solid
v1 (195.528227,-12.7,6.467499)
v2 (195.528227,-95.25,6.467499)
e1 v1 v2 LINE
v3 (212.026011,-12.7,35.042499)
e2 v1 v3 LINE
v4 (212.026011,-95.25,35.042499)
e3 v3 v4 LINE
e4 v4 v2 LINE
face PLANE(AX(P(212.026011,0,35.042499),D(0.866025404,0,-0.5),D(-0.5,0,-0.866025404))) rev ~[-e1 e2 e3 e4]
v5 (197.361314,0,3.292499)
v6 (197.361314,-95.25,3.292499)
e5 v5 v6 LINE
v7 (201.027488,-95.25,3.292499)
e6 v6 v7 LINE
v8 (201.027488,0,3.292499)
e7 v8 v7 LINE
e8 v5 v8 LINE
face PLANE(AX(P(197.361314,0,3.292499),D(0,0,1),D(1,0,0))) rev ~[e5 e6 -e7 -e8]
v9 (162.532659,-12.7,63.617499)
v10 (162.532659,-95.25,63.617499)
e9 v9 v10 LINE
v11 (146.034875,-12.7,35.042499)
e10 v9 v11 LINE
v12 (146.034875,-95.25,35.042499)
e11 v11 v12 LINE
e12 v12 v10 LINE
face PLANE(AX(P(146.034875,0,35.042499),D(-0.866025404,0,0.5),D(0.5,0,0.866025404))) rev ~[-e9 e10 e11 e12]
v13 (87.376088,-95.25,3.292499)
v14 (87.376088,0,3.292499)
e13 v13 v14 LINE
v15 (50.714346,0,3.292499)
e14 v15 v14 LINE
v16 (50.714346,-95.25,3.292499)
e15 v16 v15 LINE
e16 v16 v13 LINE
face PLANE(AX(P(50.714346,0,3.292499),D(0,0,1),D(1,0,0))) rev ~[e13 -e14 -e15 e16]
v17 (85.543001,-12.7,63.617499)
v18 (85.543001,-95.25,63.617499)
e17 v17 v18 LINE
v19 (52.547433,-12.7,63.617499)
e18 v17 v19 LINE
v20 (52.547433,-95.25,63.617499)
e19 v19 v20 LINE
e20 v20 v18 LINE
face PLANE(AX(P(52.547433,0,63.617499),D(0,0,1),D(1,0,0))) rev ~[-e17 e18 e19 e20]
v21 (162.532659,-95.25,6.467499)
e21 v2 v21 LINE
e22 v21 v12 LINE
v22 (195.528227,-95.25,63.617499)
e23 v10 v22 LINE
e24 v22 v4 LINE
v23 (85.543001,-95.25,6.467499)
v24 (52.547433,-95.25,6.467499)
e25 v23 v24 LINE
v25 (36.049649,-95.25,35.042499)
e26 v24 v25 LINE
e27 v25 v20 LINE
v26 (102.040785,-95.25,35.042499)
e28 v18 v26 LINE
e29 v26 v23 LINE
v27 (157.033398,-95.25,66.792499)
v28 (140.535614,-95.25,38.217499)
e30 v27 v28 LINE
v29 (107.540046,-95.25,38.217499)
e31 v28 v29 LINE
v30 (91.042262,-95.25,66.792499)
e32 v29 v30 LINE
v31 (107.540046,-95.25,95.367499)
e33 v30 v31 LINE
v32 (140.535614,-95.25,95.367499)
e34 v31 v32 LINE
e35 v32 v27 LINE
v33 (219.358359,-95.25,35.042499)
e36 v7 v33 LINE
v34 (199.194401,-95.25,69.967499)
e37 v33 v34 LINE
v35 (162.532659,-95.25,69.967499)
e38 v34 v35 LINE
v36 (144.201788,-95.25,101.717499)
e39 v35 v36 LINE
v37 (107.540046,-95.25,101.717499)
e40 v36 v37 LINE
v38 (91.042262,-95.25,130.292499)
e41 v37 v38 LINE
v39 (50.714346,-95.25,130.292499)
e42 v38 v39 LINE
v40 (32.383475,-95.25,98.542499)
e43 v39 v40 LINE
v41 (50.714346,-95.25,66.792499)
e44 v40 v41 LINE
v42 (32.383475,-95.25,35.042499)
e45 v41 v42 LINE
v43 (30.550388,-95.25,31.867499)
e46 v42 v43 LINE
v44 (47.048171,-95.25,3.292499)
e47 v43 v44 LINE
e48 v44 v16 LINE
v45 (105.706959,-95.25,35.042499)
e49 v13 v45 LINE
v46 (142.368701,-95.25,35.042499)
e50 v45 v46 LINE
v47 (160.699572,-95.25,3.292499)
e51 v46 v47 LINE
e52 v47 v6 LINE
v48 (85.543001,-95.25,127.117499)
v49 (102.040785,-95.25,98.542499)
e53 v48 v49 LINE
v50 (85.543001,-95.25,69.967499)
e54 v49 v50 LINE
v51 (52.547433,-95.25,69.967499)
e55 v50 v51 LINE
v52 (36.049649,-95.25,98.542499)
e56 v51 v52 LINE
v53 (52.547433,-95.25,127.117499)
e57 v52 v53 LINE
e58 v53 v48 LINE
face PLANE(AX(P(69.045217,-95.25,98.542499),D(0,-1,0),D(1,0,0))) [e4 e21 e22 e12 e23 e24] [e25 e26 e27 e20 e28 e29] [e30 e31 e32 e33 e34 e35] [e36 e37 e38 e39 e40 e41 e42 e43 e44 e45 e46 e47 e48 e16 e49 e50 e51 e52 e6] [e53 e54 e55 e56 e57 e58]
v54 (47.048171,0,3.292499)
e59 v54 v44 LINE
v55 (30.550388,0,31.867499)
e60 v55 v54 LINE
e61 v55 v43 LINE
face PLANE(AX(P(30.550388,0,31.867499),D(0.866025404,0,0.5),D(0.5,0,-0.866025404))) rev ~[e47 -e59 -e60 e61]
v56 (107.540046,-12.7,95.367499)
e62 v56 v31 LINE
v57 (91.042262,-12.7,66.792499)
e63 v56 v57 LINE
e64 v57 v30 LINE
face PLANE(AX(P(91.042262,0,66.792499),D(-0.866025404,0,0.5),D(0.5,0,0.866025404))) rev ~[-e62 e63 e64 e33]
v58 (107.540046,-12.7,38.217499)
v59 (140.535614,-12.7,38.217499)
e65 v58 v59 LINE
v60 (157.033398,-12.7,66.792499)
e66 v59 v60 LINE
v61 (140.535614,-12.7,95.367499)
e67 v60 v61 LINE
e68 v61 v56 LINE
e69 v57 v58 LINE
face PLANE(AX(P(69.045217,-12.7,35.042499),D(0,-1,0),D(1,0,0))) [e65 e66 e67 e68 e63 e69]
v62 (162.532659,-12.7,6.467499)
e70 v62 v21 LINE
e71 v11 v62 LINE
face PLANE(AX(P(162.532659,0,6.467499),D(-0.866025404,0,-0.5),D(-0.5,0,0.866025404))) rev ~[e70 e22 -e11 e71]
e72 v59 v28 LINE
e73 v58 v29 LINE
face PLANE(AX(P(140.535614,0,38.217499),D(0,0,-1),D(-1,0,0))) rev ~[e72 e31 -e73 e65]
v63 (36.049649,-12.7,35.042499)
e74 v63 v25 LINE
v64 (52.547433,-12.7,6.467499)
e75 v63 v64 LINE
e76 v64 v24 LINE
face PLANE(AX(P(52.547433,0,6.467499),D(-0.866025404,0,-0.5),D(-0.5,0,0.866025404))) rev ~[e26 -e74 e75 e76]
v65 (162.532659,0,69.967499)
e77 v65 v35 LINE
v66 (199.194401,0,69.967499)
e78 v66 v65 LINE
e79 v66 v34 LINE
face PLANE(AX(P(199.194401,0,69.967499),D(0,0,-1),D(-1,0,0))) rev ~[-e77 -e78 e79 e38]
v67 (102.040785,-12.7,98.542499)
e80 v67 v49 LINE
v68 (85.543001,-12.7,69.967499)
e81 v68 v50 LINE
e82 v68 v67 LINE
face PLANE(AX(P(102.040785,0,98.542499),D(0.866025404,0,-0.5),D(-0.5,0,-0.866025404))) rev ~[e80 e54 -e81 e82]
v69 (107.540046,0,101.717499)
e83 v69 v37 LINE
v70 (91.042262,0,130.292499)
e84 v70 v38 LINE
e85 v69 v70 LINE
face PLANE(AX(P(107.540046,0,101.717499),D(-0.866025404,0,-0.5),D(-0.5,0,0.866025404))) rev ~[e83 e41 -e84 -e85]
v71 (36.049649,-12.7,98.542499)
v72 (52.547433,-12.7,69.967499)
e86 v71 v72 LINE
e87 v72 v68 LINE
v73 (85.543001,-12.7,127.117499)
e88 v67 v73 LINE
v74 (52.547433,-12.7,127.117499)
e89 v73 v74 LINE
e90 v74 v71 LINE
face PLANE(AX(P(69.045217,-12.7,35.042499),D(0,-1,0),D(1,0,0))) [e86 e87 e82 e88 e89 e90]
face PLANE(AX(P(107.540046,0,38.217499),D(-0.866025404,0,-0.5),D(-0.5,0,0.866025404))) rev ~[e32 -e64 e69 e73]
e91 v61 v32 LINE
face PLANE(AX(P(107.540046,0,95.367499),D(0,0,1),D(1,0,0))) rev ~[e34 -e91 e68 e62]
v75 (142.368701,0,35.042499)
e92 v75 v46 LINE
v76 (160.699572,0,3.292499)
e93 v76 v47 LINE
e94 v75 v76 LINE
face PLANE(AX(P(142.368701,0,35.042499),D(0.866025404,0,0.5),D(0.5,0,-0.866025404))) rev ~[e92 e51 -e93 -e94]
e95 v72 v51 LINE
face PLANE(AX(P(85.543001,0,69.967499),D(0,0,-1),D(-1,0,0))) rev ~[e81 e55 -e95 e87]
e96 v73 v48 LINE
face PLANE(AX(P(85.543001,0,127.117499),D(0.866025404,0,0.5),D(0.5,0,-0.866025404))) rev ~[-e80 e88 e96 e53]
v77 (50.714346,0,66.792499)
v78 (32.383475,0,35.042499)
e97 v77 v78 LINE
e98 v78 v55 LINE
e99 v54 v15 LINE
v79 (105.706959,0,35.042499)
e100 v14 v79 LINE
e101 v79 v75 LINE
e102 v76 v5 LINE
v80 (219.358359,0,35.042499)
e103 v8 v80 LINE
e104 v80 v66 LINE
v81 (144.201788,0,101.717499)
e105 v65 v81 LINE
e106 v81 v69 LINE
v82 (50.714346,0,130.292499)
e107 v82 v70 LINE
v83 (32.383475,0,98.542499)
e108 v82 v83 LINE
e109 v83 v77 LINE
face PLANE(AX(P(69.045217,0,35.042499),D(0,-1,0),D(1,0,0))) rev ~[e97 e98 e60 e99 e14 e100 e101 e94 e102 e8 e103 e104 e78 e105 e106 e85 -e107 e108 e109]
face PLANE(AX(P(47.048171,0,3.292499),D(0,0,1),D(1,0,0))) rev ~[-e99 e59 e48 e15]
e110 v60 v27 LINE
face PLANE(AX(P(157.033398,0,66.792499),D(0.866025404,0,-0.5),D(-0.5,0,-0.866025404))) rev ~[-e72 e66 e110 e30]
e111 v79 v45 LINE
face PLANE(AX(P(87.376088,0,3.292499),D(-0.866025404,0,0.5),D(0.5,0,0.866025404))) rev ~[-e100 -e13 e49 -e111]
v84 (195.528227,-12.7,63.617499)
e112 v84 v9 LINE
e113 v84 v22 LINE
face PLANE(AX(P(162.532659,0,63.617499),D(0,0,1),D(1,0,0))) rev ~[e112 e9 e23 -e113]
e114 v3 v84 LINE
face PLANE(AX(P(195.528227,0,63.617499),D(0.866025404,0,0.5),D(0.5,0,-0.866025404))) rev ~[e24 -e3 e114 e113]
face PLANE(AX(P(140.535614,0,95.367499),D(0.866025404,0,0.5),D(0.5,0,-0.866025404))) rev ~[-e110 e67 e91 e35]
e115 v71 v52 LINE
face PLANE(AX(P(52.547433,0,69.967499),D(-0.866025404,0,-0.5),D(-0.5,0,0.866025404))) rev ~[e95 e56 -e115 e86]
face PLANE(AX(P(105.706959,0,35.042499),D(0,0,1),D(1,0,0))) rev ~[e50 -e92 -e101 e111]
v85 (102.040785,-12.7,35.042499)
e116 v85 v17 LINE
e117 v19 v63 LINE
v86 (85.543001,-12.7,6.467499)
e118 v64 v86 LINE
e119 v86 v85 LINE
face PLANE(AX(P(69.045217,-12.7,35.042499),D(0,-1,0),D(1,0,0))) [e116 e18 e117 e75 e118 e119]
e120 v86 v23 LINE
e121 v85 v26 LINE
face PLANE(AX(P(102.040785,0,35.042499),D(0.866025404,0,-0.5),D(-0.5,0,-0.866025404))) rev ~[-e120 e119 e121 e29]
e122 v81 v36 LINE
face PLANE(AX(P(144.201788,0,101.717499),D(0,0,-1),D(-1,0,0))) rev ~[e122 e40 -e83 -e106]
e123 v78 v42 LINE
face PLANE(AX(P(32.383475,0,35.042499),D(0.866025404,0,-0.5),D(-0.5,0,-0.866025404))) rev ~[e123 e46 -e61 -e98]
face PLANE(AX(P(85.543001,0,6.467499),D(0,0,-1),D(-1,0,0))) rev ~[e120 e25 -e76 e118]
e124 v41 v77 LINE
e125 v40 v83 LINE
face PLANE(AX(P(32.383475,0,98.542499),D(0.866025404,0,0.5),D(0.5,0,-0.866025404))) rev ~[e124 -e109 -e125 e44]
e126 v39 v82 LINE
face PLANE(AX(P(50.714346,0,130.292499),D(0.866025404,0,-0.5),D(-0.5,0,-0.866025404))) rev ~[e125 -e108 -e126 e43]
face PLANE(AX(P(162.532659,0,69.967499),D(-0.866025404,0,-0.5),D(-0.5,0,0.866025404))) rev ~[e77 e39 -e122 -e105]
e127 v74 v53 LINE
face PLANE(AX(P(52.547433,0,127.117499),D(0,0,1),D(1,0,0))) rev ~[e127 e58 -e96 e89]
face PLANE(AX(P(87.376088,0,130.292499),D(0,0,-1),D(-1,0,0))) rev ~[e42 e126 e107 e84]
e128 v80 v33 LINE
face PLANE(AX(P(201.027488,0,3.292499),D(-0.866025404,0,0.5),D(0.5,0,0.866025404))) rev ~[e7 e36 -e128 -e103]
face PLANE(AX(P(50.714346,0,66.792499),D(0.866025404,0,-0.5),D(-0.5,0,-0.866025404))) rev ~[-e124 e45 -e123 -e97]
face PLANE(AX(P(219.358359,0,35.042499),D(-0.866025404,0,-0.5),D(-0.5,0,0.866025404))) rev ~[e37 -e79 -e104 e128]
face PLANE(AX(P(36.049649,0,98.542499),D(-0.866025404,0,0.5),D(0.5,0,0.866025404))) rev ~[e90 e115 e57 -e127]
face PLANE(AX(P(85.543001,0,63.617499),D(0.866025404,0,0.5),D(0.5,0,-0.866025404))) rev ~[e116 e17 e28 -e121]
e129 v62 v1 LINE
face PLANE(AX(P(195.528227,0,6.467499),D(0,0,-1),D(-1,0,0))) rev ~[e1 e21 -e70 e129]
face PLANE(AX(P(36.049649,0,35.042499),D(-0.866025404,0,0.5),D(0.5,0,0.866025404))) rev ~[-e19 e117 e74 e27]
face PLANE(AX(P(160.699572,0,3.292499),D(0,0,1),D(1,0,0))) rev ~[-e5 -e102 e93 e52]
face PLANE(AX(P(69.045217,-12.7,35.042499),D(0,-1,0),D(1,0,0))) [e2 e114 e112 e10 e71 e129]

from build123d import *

# Parameters (mm, degrees)
F1_DEPTH = 12.7
F2_DEPTH = 95.25


# Not quite as in the source:
# - a feature names something its author has since deleted; it is built from what else it names


with BuildPart() as f1:
    # F0 (on Front) → F1 (new body)
    with BuildSketch(Plane.XZ):
        Polygon((87.3760877519, 66.7924993012), (50.7143456583, 66.7924993012), (32.3834746116, 35.0424993012), (50.7143456583, 3.2924993012), (87.3760877518, 3.2924993011), (105.7069587986, 35.0424993011), align=None)
        Polygon((52.547432763, 6.4674993012), (36.0496488209, 35.0424993012), (52.547432763, 63.6174993012), (85.5430006472, 63.6174993011), (102.0407845893, 35.0424993011), (85.5430006472, 6.4674993011), align=None, mode=Mode.SUBTRACT)
        Polygon((50.7143456583, 130.2924993012), (32.3834746116, 98.5424993012), (50.7143456583, 66.7924993012), (87.3760877519, 66.7924993012), (105.7069587986, 98.5424993012), (87.3760877519, 130.2924993012), align=None)
        Polygon((52.547432763, 69.9674993012), (36.0496488209, 98.5424993012), (52.547432763, 127.1174993012), (85.5430006472, 127.1174993012), (102.0407845893, 98.5424993012), (85.5430006472, 69.9674993012), align=None, mode=Mode.SUBTRACT)
        Polygon((160.699571939, 66.7924993012), (142.3687008922, 35.0424993012), (160.6995719389, 3.2924993011), (197.3613140325, 3.2924993011), (215.6921850793, 35.0424993012), (197.3613140325, 66.7924993012), align=None)
        Polygon((162.5326590436, 6.4674993012), (146.0348751015, 35.0424993012), (162.5326590436, 63.6174993012), (195.5282269278, 63.6174993012), (212.0260108699, 35.0424993012), (195.5282269278, 6.4674993012), align=None, mode=Mode.SUBTRACT)
        Polygon((105.7069587986, 98.5424993012), (87.3760877519, 66.7924993012), (105.7069587986, 35.0424993011), (142.3687008922, 35.0424993011), (160.699571939, 66.7924993012), (142.3687008922, 98.5424993012), align=None)
        Polygon((107.5400459033, 38.2174993012), (91.0422619612, 66.7924993012), (107.5400459033, 95.3674993012), (140.5356137875, 95.3674993012), (157.0333977296, 66.7924993012), (140.5356137875, 38.2174993012), align=None, mode=Mode.SUBTRACT)
        Polygon((52.547432763, 127.1174993012), (36.0496488209, 98.5424993012), (52.547432763, 69.9674993012), (85.5430006472, 69.9674993012), (102.0407845893, 98.5424993012), (85.5430006472, 127.1174993012), align=None)
        Polygon((52.547432763, 63.6174993012), (36.0496488209, 35.0424993012), (52.547432763, 6.4674993012), (85.5430006472, 6.4674993011), (102.0407845893, 35.0424993011), (85.5430006472, 63.6174993011), align=None)
        Polygon((162.5326590436, 63.6174993012), (146.0348751015, 35.0424993012), (162.5326590436, 6.4674993012), (195.5282269278, 6.4674993012), (212.0260108699, 35.0424993012), (195.5282269278, 63.6174993012), align=None)
        Polygon((107.5400459033, 95.3674993012), (91.0422619612, 66.7924993012), (107.5400459033, 38.2174993012), (140.5356137875, 38.2174993012), (157.0333977296, 66.7924993012), (140.5356137875, 95.3674993012), align=None)
    extrude(amount=F1_DEPTH)

    # F0 (on Front) → F2 (join)
    with BuildSketch(Plane.XZ):
        Polygon((50.7143456583, 130.2924993012), (32.3834746116, 98.5424993012), (50.7143456583, 66.7924993012), (87.3760877519, 66.7924993012), (105.7069587986, 98.5424993012), (87.3760877519, 130.2924993012), align=None)
        Polygon((52.547432763, 69.9674993012), (36.0496488209, 98.5424993012), (52.547432763, 127.1174993012), (85.5430006472, 127.1174993012), (102.0407845893, 98.5424993012), (85.5430006472, 69.9674993012), align=None, mode=Mode.SUBTRACT)
        Polygon((87.3760877519, 66.7924993012), (50.7143456583, 66.7924993012), (32.3834746116, 35.0424993012), (50.7143456583, 3.2924993012), (87.3760877518, 3.2924993011), (105.7069587986, 35.0424993011), align=None)
        Polygon((52.547432763, 6.4674993012), (36.0496488209, 35.0424993012), (52.547432763, 63.6174993012), (85.5430006472, 63.6174993011), (102.0407845893, 35.0424993011), (85.5430006472, 6.4674993011), align=None, mode=Mode.SUBTRACT)
        Polygon((105.7069587986, 98.5424993012), (87.3760877519, 66.7924993012), (105.7069587986, 35.0424993011), (142.3687008922, 35.0424993011), (160.699571939, 66.7924993012), (142.3687008922, 98.5424993012), align=None)
        Polygon((107.5400459033, 38.2174993012), (91.0422619612, 66.7924993012), (107.5400459033, 95.3674993012), (140.5356137875, 95.3674993012), (157.0333977296, 66.7924993012), (140.5356137875, 38.2174993012), align=None, mode=Mode.SUBTRACT)
        Polygon((160.699571939, 66.7924993012), (142.3687008922, 35.0424993012), (160.6995719389, 3.2924993011), (197.3613140325, 3.2924993011), (215.6921850793, 35.0424993012), (197.3613140325, 66.7924993012), align=None)
        Polygon((162.5326590436, 6.4674993012), (146.0348751015, 35.0424993012), (162.5326590436, 63.6174993012), (195.5282269278, 63.6174993012), (212.0260108699, 35.0424993012), (195.5282269278, 6.4674993012), align=None, mode=Mode.SUBTRACT)
        Polygon((91.0422619612, 130.2924993012), (87.3760877519, 130.2924993012), (105.7069587986, 98.5424993012), (142.3687008922, 98.5424993012), (160.699571939, 66.7924993012), (197.3613140325, 66.7924993012), (215.6921850793, 35.0424993012), (197.3613140325, 3.2924993012), (201.0274882418, 3.2924993011), (219.3583592886, 35.0424993012), (199.1944011372, 69.9674993012), (162.5326590436, 69.9674993012), (144.2017879969, 101.7174993012), (107.5400459033, 101.7174993012), align=None)
        Polygon((50.7143456583, 3.2924993012), (32.3834746116, 35.0424993012), (30.5503875069, 31.8674993012), (47.048171449, 3.2924993012), align=None)
    extrude(amount=F2_DEPTH)


solid = f1.part
